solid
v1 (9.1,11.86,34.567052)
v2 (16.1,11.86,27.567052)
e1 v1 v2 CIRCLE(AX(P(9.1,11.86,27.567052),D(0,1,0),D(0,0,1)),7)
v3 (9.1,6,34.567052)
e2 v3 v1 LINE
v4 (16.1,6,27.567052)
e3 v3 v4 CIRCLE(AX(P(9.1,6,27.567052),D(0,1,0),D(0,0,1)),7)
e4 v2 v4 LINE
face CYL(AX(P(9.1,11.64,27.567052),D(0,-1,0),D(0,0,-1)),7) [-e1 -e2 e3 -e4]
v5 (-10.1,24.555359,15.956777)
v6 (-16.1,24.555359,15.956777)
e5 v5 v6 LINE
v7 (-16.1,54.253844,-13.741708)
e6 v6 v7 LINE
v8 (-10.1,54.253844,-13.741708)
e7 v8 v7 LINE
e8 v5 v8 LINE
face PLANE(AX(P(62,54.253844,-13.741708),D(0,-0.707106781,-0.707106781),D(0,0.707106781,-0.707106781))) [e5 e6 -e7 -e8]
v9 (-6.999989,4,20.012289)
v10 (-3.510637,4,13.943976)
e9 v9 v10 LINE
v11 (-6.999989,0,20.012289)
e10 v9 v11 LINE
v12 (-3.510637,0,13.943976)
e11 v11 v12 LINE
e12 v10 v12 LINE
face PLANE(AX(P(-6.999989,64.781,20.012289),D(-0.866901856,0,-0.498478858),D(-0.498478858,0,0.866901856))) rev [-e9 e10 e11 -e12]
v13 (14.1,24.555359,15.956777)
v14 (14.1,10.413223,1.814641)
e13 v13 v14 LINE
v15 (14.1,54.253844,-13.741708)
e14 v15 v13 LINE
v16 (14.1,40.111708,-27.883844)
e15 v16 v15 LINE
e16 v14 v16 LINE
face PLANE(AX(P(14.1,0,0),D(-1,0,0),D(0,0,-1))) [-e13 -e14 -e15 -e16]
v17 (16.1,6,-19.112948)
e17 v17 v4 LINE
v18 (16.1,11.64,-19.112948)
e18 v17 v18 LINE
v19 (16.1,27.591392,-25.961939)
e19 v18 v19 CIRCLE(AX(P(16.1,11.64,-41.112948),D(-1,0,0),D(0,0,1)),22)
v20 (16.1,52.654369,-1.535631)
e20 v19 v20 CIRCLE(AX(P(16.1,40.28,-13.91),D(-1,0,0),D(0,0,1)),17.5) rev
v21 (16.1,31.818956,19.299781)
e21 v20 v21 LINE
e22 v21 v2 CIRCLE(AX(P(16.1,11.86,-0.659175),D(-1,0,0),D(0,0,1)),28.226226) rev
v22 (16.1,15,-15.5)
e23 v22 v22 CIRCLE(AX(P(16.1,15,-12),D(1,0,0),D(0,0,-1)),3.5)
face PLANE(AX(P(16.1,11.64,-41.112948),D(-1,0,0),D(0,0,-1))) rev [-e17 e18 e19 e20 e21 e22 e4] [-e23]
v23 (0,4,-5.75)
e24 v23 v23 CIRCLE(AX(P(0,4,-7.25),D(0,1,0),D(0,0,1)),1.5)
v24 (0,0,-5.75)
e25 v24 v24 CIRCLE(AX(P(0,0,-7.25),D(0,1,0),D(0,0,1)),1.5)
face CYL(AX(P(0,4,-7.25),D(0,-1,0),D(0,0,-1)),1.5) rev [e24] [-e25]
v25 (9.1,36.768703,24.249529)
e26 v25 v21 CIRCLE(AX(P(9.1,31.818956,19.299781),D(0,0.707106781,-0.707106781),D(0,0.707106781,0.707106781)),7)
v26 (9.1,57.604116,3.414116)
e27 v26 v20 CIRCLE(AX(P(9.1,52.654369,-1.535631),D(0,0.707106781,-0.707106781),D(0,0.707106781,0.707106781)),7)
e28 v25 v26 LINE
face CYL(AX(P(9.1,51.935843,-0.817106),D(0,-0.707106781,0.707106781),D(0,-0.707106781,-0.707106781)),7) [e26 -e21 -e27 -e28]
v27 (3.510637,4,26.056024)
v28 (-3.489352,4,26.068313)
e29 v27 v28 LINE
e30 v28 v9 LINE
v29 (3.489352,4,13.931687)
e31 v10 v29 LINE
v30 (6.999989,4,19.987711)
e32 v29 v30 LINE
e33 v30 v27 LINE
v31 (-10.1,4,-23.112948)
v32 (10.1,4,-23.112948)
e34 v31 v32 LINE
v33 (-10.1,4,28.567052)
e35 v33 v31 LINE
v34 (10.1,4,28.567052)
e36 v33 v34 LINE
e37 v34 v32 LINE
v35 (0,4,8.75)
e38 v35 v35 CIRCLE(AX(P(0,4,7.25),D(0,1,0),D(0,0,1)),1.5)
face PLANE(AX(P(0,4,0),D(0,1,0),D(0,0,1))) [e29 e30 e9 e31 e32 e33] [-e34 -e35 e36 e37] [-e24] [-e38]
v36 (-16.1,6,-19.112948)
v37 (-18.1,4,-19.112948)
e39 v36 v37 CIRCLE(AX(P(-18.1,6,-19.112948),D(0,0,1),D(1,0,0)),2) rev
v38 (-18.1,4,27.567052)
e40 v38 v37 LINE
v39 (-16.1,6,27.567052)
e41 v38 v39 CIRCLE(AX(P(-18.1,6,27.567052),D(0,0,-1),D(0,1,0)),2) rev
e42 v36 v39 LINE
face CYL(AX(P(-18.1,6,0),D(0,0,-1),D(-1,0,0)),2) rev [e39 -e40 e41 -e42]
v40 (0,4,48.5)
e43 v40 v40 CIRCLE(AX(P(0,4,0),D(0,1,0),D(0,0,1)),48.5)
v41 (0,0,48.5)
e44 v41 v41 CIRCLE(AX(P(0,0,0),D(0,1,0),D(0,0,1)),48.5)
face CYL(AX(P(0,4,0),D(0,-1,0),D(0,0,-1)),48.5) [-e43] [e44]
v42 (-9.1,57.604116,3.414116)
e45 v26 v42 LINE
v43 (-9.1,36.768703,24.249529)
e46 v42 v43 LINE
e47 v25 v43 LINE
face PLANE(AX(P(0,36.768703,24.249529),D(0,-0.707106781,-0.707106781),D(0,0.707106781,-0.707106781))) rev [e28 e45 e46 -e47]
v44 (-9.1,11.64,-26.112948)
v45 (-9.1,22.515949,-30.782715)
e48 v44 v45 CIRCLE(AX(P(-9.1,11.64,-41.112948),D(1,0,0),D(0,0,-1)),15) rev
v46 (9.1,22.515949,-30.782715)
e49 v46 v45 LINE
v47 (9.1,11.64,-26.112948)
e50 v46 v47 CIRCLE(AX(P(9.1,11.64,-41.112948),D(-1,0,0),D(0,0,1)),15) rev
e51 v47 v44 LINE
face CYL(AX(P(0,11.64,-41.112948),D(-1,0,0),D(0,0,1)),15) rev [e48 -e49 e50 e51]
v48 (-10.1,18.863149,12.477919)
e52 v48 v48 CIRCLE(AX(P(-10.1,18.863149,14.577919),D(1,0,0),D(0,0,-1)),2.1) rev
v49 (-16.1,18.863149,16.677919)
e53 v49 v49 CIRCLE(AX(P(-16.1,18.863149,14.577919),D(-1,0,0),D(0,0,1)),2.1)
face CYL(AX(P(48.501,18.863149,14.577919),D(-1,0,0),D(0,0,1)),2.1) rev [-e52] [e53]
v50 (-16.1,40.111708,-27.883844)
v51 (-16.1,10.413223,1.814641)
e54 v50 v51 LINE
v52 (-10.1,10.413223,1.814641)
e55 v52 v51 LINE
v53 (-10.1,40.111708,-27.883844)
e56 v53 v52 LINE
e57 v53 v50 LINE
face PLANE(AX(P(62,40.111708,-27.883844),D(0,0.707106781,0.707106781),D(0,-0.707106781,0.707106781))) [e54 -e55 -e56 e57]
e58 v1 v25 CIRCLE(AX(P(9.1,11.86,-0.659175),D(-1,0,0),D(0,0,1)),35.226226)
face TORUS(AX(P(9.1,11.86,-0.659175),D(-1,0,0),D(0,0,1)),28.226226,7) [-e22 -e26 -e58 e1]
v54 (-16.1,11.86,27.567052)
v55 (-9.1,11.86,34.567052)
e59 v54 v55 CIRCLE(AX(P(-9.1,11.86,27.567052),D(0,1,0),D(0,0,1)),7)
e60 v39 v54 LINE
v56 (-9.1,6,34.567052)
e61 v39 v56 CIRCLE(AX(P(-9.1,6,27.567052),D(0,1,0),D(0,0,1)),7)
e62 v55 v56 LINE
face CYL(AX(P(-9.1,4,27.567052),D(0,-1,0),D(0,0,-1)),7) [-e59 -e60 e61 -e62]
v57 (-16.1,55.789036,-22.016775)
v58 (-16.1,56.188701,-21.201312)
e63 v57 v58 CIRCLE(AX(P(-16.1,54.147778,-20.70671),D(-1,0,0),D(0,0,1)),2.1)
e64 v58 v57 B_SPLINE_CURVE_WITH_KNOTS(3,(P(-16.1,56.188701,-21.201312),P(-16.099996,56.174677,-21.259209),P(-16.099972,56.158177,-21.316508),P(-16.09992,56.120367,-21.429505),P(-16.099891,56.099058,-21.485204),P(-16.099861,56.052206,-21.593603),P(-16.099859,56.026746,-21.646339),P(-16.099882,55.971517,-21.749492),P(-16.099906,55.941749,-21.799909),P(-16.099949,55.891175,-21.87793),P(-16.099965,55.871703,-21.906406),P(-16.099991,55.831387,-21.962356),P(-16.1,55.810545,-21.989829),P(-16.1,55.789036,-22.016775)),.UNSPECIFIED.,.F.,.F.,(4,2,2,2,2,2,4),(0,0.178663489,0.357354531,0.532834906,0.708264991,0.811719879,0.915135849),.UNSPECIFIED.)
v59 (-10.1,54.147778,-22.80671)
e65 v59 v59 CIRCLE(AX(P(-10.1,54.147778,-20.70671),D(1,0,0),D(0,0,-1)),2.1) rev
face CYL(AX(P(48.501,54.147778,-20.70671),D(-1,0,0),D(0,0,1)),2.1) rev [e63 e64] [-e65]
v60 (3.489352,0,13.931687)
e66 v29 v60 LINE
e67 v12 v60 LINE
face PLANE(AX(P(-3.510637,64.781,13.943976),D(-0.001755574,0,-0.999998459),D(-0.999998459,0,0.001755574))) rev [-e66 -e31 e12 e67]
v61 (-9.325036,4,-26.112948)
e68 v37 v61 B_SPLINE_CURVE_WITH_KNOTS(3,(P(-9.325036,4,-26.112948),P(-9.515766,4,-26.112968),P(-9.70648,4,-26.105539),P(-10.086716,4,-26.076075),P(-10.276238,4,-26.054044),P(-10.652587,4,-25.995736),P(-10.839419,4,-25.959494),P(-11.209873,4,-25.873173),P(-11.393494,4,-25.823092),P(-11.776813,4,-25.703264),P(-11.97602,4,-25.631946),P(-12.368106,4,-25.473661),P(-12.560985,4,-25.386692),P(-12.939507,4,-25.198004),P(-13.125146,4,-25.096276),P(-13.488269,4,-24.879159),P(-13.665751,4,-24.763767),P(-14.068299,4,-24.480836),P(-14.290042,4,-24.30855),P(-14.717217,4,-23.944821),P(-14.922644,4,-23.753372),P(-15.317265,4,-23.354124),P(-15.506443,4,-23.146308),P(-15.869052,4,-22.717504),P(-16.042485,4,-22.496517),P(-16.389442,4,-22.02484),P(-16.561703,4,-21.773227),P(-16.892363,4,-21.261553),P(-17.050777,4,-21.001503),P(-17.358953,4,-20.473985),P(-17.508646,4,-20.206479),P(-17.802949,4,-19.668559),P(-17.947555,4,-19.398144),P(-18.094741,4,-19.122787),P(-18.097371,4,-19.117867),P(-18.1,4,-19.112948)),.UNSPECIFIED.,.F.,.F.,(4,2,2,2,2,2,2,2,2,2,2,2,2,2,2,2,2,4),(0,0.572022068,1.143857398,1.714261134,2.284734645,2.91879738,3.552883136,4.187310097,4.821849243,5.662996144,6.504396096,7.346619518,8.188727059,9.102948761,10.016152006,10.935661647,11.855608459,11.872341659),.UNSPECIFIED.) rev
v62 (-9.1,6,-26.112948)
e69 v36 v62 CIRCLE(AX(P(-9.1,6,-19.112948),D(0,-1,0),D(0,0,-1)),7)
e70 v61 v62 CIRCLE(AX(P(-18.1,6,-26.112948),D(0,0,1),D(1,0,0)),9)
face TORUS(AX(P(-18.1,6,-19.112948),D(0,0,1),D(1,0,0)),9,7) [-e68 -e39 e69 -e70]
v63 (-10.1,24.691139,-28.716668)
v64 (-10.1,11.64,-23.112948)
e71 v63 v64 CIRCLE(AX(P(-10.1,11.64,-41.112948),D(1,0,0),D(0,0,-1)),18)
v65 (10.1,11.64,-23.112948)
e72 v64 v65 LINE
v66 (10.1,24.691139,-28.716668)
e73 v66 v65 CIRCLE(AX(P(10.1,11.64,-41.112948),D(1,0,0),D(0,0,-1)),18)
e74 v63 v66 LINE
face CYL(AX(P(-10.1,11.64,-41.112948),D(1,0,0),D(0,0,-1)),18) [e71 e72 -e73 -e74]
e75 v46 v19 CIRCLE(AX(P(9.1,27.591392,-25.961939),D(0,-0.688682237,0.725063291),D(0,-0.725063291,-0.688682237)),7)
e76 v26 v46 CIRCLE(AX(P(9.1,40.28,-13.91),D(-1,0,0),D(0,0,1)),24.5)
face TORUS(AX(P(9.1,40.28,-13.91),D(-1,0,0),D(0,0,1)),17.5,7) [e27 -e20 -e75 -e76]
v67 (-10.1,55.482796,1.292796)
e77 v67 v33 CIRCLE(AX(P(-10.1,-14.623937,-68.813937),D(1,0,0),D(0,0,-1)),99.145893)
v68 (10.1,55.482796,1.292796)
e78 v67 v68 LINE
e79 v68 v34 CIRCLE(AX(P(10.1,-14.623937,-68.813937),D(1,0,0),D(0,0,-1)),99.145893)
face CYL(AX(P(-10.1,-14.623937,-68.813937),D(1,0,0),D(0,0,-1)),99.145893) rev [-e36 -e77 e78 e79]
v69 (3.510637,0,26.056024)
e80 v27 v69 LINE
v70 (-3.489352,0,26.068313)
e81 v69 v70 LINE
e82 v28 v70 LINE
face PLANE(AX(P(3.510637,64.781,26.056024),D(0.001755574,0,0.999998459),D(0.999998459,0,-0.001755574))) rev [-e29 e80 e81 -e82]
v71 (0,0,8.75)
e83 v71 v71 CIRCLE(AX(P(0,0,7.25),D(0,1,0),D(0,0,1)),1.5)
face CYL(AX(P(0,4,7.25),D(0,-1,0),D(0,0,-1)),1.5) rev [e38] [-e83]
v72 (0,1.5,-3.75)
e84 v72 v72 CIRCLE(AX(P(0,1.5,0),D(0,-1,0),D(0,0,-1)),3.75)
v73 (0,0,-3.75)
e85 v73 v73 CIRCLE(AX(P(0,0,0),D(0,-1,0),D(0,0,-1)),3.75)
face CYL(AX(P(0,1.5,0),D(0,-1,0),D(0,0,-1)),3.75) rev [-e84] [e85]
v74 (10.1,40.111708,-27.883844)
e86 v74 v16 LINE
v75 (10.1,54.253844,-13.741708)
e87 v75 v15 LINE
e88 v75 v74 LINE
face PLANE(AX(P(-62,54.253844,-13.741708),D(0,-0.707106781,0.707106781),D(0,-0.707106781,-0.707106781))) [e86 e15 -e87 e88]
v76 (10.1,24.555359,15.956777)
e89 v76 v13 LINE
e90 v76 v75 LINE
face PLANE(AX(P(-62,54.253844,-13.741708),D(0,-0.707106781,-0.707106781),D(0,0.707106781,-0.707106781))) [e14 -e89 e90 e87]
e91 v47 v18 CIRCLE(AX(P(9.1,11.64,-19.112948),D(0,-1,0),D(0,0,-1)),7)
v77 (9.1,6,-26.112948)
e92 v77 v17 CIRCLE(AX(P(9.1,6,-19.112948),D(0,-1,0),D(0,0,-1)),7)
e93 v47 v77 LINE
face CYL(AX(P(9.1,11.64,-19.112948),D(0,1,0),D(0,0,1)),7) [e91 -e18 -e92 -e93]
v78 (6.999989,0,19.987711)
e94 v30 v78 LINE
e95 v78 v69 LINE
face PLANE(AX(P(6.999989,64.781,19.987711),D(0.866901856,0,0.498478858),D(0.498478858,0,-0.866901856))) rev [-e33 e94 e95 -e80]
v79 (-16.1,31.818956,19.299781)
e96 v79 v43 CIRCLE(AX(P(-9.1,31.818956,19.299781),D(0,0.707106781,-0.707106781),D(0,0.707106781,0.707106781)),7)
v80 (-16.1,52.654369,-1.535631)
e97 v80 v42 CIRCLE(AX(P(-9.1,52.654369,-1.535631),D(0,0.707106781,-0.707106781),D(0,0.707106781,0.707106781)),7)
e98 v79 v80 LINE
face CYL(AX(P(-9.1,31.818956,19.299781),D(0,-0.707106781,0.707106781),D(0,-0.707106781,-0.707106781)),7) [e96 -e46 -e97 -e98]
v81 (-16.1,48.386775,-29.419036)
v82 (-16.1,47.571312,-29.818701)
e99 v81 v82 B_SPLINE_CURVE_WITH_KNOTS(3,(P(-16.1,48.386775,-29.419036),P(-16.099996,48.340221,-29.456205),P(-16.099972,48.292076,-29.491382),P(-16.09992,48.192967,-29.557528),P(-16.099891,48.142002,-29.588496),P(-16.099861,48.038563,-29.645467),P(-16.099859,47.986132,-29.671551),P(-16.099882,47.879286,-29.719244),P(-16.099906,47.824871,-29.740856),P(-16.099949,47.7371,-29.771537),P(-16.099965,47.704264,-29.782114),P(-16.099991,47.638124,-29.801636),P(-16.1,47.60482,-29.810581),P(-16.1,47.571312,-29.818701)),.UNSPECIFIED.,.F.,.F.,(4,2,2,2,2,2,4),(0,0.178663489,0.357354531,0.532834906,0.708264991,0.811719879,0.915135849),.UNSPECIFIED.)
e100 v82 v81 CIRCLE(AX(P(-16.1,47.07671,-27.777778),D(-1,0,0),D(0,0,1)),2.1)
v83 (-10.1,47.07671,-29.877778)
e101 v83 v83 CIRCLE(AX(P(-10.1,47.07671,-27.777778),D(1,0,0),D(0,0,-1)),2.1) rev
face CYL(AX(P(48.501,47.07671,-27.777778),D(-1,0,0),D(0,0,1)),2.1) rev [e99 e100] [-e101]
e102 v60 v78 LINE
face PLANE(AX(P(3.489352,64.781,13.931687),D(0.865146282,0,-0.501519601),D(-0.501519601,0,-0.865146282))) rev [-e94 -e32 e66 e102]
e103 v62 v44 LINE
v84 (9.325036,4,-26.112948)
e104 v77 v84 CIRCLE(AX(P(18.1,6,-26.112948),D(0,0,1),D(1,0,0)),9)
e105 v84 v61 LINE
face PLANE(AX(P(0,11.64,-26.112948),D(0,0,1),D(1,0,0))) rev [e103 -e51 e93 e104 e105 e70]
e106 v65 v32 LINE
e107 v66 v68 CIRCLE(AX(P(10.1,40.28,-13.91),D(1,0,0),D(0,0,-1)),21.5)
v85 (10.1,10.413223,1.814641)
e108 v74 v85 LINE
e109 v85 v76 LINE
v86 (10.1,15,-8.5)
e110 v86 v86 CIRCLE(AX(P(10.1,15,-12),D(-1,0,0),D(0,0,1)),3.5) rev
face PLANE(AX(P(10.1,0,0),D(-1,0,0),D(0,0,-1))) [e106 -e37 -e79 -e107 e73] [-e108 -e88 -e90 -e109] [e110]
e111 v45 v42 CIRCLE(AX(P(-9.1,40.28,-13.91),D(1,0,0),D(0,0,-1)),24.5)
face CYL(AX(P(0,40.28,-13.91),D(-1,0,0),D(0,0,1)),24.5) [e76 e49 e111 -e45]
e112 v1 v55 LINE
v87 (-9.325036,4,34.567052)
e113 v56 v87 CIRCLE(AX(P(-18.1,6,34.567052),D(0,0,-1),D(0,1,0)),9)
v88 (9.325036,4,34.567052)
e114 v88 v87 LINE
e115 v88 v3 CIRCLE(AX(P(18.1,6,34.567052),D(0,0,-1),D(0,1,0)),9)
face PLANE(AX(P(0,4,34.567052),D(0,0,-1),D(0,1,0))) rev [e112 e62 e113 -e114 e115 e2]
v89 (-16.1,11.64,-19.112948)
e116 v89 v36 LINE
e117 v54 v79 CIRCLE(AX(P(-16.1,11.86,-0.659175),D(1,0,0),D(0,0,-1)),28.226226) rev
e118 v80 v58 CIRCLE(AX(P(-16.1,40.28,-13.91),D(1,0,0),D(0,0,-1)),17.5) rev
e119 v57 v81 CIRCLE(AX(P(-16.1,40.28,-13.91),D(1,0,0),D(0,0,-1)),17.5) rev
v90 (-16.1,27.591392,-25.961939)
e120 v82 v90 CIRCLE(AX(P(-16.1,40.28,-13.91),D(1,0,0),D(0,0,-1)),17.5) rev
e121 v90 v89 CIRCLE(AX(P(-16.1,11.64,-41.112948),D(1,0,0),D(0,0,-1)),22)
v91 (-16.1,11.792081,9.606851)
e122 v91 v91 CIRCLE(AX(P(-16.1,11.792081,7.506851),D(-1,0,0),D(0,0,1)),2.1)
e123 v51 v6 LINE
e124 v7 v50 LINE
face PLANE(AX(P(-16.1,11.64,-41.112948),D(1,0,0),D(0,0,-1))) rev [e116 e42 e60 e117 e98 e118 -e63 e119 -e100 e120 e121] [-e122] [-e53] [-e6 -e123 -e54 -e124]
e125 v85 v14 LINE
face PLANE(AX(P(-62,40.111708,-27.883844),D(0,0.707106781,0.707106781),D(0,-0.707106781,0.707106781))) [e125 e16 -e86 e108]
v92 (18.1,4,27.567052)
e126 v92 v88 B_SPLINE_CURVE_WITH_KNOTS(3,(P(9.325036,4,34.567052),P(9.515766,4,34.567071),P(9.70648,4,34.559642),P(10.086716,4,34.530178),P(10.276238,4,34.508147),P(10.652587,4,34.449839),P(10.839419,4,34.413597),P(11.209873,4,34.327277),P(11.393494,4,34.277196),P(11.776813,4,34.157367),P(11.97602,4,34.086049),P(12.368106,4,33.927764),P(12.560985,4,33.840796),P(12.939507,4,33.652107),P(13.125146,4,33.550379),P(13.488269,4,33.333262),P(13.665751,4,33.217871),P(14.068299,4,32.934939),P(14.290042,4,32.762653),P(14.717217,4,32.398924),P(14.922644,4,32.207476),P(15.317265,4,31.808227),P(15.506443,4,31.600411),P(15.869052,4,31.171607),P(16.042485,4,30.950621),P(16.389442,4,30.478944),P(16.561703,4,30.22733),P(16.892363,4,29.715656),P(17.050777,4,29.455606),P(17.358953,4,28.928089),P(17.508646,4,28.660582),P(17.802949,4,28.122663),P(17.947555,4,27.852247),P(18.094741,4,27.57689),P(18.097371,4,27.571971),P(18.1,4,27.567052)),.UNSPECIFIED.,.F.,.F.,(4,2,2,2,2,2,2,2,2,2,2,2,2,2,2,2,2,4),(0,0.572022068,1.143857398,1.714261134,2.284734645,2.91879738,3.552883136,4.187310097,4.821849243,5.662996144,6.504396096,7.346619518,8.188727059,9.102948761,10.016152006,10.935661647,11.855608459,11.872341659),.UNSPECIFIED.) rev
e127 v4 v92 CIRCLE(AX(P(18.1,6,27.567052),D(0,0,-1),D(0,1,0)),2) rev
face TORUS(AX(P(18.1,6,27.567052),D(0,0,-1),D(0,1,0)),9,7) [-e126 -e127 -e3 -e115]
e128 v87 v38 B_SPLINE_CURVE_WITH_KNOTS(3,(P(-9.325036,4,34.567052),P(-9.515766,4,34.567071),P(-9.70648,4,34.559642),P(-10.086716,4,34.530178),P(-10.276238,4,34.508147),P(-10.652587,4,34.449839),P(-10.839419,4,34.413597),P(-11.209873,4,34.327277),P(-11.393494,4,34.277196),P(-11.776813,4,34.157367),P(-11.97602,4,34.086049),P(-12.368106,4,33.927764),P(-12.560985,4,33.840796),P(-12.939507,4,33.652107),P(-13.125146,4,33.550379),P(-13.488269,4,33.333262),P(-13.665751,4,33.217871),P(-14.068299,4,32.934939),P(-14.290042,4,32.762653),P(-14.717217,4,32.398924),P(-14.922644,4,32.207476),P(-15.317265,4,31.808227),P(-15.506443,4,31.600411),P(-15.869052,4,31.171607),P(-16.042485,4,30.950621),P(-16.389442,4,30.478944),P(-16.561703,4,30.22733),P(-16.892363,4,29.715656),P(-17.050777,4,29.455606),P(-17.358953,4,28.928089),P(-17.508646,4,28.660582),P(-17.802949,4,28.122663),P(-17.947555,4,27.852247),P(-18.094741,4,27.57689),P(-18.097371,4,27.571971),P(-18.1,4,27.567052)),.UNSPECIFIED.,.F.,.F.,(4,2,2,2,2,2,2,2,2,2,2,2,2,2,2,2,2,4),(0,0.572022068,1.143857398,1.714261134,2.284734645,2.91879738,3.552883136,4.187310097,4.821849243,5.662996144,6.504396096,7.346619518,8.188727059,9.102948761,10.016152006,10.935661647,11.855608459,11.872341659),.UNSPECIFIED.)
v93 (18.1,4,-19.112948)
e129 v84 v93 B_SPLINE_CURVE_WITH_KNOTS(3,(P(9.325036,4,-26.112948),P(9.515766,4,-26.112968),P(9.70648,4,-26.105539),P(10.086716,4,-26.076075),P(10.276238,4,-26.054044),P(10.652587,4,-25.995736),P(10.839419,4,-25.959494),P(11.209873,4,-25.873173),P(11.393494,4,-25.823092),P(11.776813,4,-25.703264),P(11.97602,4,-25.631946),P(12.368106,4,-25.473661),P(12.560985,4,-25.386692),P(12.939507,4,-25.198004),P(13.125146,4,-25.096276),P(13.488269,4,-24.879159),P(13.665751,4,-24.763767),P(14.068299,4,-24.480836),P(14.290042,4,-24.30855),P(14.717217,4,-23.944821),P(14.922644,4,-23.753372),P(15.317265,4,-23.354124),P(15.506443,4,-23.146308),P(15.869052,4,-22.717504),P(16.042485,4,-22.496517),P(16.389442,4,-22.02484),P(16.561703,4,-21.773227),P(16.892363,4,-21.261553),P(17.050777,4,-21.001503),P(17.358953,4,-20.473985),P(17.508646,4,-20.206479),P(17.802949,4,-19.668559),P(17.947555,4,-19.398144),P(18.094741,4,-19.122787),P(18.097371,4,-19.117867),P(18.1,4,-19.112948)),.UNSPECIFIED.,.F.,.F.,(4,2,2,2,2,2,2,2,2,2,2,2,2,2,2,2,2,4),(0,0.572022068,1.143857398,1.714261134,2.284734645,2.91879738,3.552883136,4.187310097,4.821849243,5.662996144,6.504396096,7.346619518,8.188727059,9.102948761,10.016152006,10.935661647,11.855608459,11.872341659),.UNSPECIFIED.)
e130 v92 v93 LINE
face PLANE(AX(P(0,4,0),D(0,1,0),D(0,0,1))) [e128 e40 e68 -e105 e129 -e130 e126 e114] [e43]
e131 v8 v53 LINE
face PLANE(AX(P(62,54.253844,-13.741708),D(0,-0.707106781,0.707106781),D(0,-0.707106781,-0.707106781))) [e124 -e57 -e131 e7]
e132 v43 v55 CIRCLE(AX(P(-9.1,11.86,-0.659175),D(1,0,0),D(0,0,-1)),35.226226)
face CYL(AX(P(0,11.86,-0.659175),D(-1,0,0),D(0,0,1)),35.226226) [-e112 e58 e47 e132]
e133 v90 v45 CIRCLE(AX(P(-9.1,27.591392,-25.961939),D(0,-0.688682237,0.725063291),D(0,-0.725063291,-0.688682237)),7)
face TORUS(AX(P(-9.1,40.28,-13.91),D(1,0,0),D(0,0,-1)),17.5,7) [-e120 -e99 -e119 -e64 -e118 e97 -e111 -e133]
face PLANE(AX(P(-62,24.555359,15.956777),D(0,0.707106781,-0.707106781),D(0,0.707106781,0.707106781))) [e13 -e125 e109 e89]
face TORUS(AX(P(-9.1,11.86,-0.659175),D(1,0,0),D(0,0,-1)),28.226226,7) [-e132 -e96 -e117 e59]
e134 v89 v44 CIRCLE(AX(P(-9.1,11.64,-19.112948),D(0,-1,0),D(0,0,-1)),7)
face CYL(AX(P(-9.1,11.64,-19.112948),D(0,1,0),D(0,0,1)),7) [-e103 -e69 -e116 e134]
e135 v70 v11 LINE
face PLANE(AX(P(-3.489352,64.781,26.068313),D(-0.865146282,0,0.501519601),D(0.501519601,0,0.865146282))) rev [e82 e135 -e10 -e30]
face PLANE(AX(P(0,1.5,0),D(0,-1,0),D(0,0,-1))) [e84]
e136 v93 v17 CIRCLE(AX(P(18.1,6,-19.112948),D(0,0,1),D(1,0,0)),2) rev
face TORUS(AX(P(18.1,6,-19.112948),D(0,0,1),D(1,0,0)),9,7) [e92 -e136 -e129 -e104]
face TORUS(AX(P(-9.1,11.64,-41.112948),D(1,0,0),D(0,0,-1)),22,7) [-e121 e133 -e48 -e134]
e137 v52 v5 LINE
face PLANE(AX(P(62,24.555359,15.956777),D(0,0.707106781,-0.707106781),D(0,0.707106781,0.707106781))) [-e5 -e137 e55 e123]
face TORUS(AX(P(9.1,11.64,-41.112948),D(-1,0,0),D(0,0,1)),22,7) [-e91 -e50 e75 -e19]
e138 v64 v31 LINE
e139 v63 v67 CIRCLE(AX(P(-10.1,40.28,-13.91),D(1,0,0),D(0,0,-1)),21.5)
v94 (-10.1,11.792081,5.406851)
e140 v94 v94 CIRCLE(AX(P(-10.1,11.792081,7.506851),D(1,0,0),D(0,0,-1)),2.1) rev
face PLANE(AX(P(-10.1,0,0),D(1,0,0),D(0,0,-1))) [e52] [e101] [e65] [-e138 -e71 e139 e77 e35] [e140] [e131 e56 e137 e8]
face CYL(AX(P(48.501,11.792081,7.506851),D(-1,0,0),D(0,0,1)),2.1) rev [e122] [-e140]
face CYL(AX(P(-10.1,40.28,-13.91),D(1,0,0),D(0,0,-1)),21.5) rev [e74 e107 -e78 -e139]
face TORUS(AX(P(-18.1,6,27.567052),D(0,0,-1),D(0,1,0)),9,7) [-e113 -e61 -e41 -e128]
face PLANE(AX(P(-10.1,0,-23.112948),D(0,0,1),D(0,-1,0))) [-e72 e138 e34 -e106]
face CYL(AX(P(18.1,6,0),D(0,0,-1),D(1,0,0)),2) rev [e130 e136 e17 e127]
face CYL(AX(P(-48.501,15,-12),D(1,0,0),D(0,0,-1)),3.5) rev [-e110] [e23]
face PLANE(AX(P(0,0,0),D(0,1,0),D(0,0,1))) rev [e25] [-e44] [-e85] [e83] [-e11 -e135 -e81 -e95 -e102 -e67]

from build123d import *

# Parameters (mm, degrees)
SKETCH1_R           = 48.5
SKETCH1_R_2         = 1.5
BOSS_EXTRUDE1_DEPTH = 4
SKETCH2_R           = 3.75
CUT_EXTRUDE1_DEPTH  = 1.5
BOSS_EXTRUDE2_DEPTH = 16.1
CUT_EXTRUDE3_DEPTH  = 14.1
FILLET3_R           = 2
CUT_EXTRUDE4_DEPTH  = 10.1
CUT_EXTRUDE5_DEPTH  = 5
CUT_EXTRUDE6_REACH  = 105.546
SKETCH7_R           = 2.1
FILLET4_R           = 7
CUT_EXTRUDE7_REACH  = 96.345
CUT_EXTRUDE9_REACH  = 105.546
SKETCH10_R          = 3.5


with BuildPart() as part:
    # Sketch1 → Boss-Extrude1 (new body)
    with BuildSketch(Plane(origin=(0, 0, 0), x_dir=(1, 0, 0), z_dir=(0, 1, 0))):
        with Locations(Location((0, 0, 0), (0, 0, 270))):
            Circle(SKETCH1_R)
        with Locations(Location((0, 7.25, 0), (0, 0, 270))):
            Circle(SKETCH1_R_2, mode=Mode.SUBTRACT)
        with Locations(Location((0, -7.25, 0), (0, 0, 270))):
            Circle(SKETCH1_R_2, mode=Mode.SUBTRACT)
    extrude(amount=BOSS_EXTRUDE1_DEPTH)

    # Sketch2 → Cut-Extrude1 (cut)
    with BuildSketch(Plane.XZ):
        with Locations(Location((0, 0, 0), (0, 0, 270))):
            Circle(SKETCH2_R)
    extrude(amount=-CUT_EXTRUDE1_DEPTH, mode=Mode.SUBTRACT)

    # Sketch3 → Boss-Extrude2 (add)
    with BuildSketch(Plane(origin=(-16.1, 0, 0), x_dir=(0, 0, -1), z_dir=(1, 0, 0))):
        with BuildLine():
            Line((-34.56705163, 4), (-34.56705163, 11.86))
            ThreePointArc((-34.56705163, 11.86), (-31.885614823, 25.340493156), (-24.249528849, 36.768703429))
            Line((-24.249528849, 36.768703429), (-3.414116139, 57.604116139))
            ThreePointArc((-3.414116139, 57.604116139), (31.45553512, 57.379830331), (30.782714812, 22.515949367))
            ThreePointArc((30.782714812, 22.515949367), (27.329742948, 17.558044298), (26.11294837, 11.64))
            Line((26.11294837, 11.64), (26.11294837, 4))
            Line((26.11294837, 4), (-34.56705163, 4))
        make_face()
    extrude(amount=BOSS_EXTRUDE2_DEPTH)

    # Sketch4 → Cut-Extrude3 (cut)
    with BuildSketch(Plane(origin=(-14.1, 0, 0), x_dir=(0, 0, -1), z_dir=(1, 0, 0))):
        Polygon((13.741708053, 54.253843677), (27.883843677, 40.111708053), (-1.814641133, 10.413223243), (-15.956776757, 24.555358867), align=None)
    extrude(amount=CUT_EXTRUDE3_DEPTH, mode=Mode.SUBTRACT)

    # Fillet3
    fillet3_edges = [part.edges().sort_by_distance(p)[0] for p in [
        (-16.1, 4, 4.22705163),
    ]]
    fillet(fillet3_edges, radius=FILLET3_R)

    # Sketch5 → Cut-Extrude4 (cut)
    with BuildSketch(Plane(origin=(0, 0, 0), x_dir=(0, 0, -1), z_dir=(1, 0, 0))):
        with BuildLine():
            ThreePointArc((-1.292795796, 55.482795796), (-18.79687153, 31.790007), (-28.56705163, 4))
            Line((-28.56705163, 4), (-8.75, 4))
            Line((-8.75, 4), (-5.75, 4))
            Line((-5.75, 4), (5.75, 4))
            Line((5.75, 4), (8.75, 4))
            Line((8.75, 4), (23.11294837, 4))
            Line((23.11294837, 4), (23.11294837, 11.64))
            ThreePointArc((23.11294837, 11.64), (24.573101864, 18.741653158), (28.7166681, 24.691139241))
            ThreePointArc((28.7166681, 24.691139241), (29.307102248, 55.285973556), (-1.292795796, 55.482795796))
        make_face()
        Polygon((27.883843677, 40.111708053), (-1.814641133, 10.413223243), (-15.956776757, 24.555358867), (13.741708053, 54.253843677), align=None, mode=Mode.SUBTRACT)
    extrude(amount=-CUT_EXTRUDE4_DEPTH, mode=Mode.SUBTRACT)

    # Mirror6: part across plane


with BuildPart() as part_1:
    add(part.part)
    add(part.part.mirror(Plane(origin=(0, 11.64, -41.11294837), x_dir=(0, 0, 1), z_dir=(1, 0, 0))))

    # Sketch6 → Cut-Extrude5 (cut)
    with BuildSketch(Plane.ZY.offset(16.1)):
        Polygon((-27.883843677, 40.111708053), (1.814641133, 10.413223243), (15.956776757, 24.555358867), (-13.741708053, 54.253843677), align=None)
    extrude(amount=-CUT_EXTRUDE5_DEPTH, mode=Mode.SUBTRACT)

    # Sketch7 → Cut-Extrude6 (cut, up to next)
    with BuildSketch(Plane.ZY.offset(16.1), mode=Mode.PRIVATE) as cut_extrude6_sk1:
        with Locations((-20.706709848, 54.14777766)):
            Circle(SKETCH7_R)
    cut_extrude6_tool1 = extrude(cut_extrude6_sk1.sketch, amount=-CUT_EXTRUDE6_REACH, mode=Mode.PRIVATE) & part_1.part
    # Sketch7 → Cut-Extrude6 (cut, up to next)
    with BuildSketch(Plane.ZY.offset(16.1), mode=Mode.PRIVATE) as cut_extrude6_sk2:
        with Locations((-27.77777766, 47.076709848)):
            Circle(SKETCH7_R)
    cut_extrude6_tool2 = extrude(cut_extrude6_sk2.sketch, amount=-CUT_EXTRUDE6_REACH, mode=Mode.PRIVATE) & part_1.part
    # Sketch7 → Cut-Extrude6 (cut, up to next)
    with BuildSketch(Plane.ZY.offset(16.1), mode=Mode.PRIVATE) as cut_extrude6_sk3:
        with Locations((14.577918533, 18.863149278)):
            Circle(SKETCH7_R)
    cut_extrude6_tool3 = extrude(cut_extrude6_sk3.sketch, amount=-CUT_EXTRUDE6_REACH, mode=Mode.PRIVATE) & part_1.part
    # Sketch7 → Cut-Extrude6 (cut, up to next)
    with BuildSketch(Plane.ZY.offset(16.1), mode=Mode.PRIVATE) as cut_extrude6_sk4:
        with Locations((7.506850722, 11.792081467)):
            Circle(SKETCH7_R)
    cut_extrude6_tool4 = extrude(cut_extrude6_sk4.sketch, amount=-CUT_EXTRUDE6_REACH, mode=Mode.PRIVATE) & part_1.part
    add(cut_extrude6_tool1.solids().sort_by_distance((-16.1, 54.147778, -20.70671))[0], mode=Mode.SUBTRACT)
    add(cut_extrude6_tool2.solids().sort_by_distance((-16.1, 47.07671, -27.777778))[0], mode=Mode.SUBTRACT)
    add(cut_extrude6_tool3.solids().sort_by_distance((-16.1, 18.863149, 14.577919))[0], mode=Mode.SUBTRACT)
    add(cut_extrude6_tool4.solids().sort_by_distance((-16.1, 11.792081, 7.506851))[0], mode=Mode.SUBTRACT)

    # Fillet4
    # the kernel refuses this fillet: 7 mm, written as the material it takes off along each edge
    with BuildSketch(Plane(origin=(16.1, 11.64, -26.11294837), x_dir=(-1, 0, 0), z_dir=(0, -1, 0))) as fillet4_piece_1:
        with BuildLine():
            CenterArc((FILLET4_R, -FILLET4_R), FILLET4_R, 90, 90)
            Line((0, -FILLET4_R), (0, 0))
            Line((0, 0), (FILLET4_R, 0))
        make_face()
    extrude(amount=5.64, mode=Mode.SUBTRACT)
    with BuildSketch(Plane(origin=(16.1, 11.64, -41.11294837), x_dir=(0, 0.7250632911392403, 0.6886822372054715), z_dir=(0, 0.6886822372054715, -0.7250632911392403))) as fillet4_piece_2:
        with BuildLine():
            CenterArc((15 + FILLET4_R, -FILLET4_R), FILLET4_R, 90, 90)
            Line((15, -FILLET4_R), (15, 0))
            Line((15, 0), (15 + FILLET4_R, 0))
        make_face()
    revolve(axis=Axis((16.1, 11.64, -41.11294837), (1, 0, 0)), revolution_arc=46.474113163, mode=Mode.SUBTRACT)
    with BuildSketch(Plane(origin=(16.1, 40.28, -13.91), x_dir=(0, 0.7071067811865517, 0.7071067811865432), z_dir=(0, -0.7071067811865432, 0.7071067811865517))) as fillet4_piece_3:
        with BuildLine():
            CenterArc((24.5 - FILLET4_R, FILLET4_R), FILLET4_R, 270, 90)
            Line((24.5, FILLET4_R), (24.5, 0))
            Line((24.5, 0), (24.5 - FILLET4_R, 0))
        make_face()
    revolve(axis=Axis((16.1, 40.28, -13.91), (-1, 0, 0)), revolution_arc=181.474113163, mode=Mode.SUBTRACT)
    with BuildSketch(Plane(origin=(16.1, 36.768703429, 24.249528849), x_dir=(0, -0.707106781186551, -0.7071067811865439), z_dir=(0, 0.707106781186544, -0.707106781186551))) as fillet4_piece_4:
        with BuildLine():
            CenterArc((FILLET4_R, FILLET4_R), FILLET4_R, 180, 90)
            Line((0, FILLET4_R), (0, 0))
            Line((0, 0), (FILLET4_R, 0))
        make_face()
    extrude(amount=29.465723232, mode=Mode.SUBTRACT)
    with BuildSketch(Plane(origin=(16.1, 11.86, -0.65917458), x_dir=(0, 0, 1), z_dir=(0, -1, 0))) as fillet4_piece_5:
        with BuildLine():
            CenterArc((35.226226211 - FILLET4_R, FILLET4_R), FILLET4_R, 270, 90)
            Line((35.226226211, FILLET4_R), (35.226226211, 0))
            Line((35.226226211, 0), (35.226226211 - FILLET4_R, 0))
        make_face()
    revolve(axis=Axis((16.1, 11.86, -0.65917458), (-1, 0, 0)), revolution_arc=45, mode=Mode.SUBTRACT)
    with BuildSketch(Plane(origin=(16.1, 6, 34.56705163), x_dir=(-1, 0, 0), z_dir=(0, 1, 0))) as fillet4_piece_6:
        with BuildLine():
            CenterArc((FILLET4_R, -FILLET4_R), FILLET4_R, 90, 90)
            Line((0, -FILLET4_R), (0, 0))
            Line((0, 0), (FILLET4_R, 0))
        make_face()
    extrude(amount=5.86, mode=Mode.SUBTRACT)
    with BuildSketch(Plane(origin=(18.1, 6, 34.56705163), x_dir=(-0.9999802608561372, 0.006283143965558844, 0), z_dir=(-0.006283143965558844, -0.9999802608561372, 0))) as fillet4_piece_7_section:
        with BuildLine():
            CenterArc((2 + FILLET4_R, FILLET4_R), FILLET4_R, 180, 90)
            Line((2 + FILLET4_R, 0), (2, 0))
            Line((2, 0), (2, FILLET4_R))
        make_face()
    fillet4_piece_7 = revolve(axis=Axis((18.1, 6, 34.56705163), (0, 0, -1)), revolution_arc=359.64, mode=Mode.PRIVATE)
    fillet4_piece_7 = split(fillet4_piece_7, bisect_by=Plane(origin=(18.1, 4, 34.56705163), z_dir=(0, 1, 0)), keep=Keep.TOP, mode=Mode.PRIVATE)
    add(fillet4_piece_7, mode=Mode.SUBTRACT)
    with BuildSketch(Plane(origin=(18.1, 6, -26.11294837), x_dir=(-0.9999802608561372, 0.006283143965558844, 0), z_dir=(-0.006283143965558844, -0.9999802608561372, 0))) as fillet4_piece_8_section:
        with BuildLine():
            CenterArc((2 + FILLET4_R, -FILLET4_R), FILLET4_R, 90, 90)
            Line((2, -FILLET4_R), (2, 0))
            Line((2, 0), (2 + FILLET4_R, 0))
        make_face()
    fillet4_piece_8 = revolve(axis=Axis((18.1, 6, -26.11294837), (0, 0, -1)), revolution_arc=359.64, mode=Mode.PRIVATE)
    fillet4_piece_8 = split(fillet4_piece_8, bisect_by=Plane(origin=(18.1, 4, -26.11294837), z_dir=(0, 1, 0)), keep=Keep.TOP, mode=Mode.PRIVATE)
    add(fillet4_piece_8, mode=Mode.SUBTRACT)
    with BuildSketch(Plane(origin=(-16.1, 11.64, -41.11294837), x_dir=(0, 0.7250632911392403, 0.6886822372054715), z_dir=(0, 0.6886822372054715, -0.7250632911392403))) as fillet4_piece_9:
        with BuildLine():
            CenterArc((15 + FILLET4_R, FILLET4_R), FILLET4_R, 180, 90)
            Line((15, FILLET4_R), (15, 0))
            Line((15, 0), (15 + FILLET4_R, 0))
        make_face()
    revolve(axis=Axis((-16.1, 11.64, -41.11294837), (1, 0, 0)), revolution_arc=46.474113163, mode=Mode.SUBTRACT)
    with BuildSketch(Plane(origin=(-16.1, 40.28, -13.91), x_dir=(0, 0.7071067811865517, 0.7071067811865432), z_dir=(0, -0.7071067811865432, 0.7071067811865517))) as fillet4_piece_10:
        with BuildLine():
            CenterArc((24.5 - FILLET4_R, -FILLET4_R), FILLET4_R, 0, 90)
            Line((24.5, -FILLET4_R), (24.5, 0))
            Line((24.5, 0), (24.5 - FILLET4_R, 0))
        make_face()
    revolve(axis=Axis((-16.1, 40.28, -13.91), (-1, 0, 0)), revolution_arc=181.474113163, mode=Mode.SUBTRACT)
    with BuildSketch(Plane(origin=(-16.1, 36.768703429, 24.249528849), x_dir=(0, -0.707106781186551, -0.7071067811865439), z_dir=(0, 0.707106781186544, -0.707106781186551))) as fillet4_piece_11:
        with BuildLine():
            CenterArc((FILLET4_R, -FILLET4_R), FILLET4_R, 90, 90)
            Line((0, -FILLET4_R), (0, 0))
            Line((0, 0), (FILLET4_R, 0))
        make_face()
    extrude(amount=29.465723232, mode=Mode.SUBTRACT)
    with BuildSketch(Plane(origin=(-16.1, 11.86, -0.65917458), x_dir=(0, 0, 1), z_dir=(0, -1, 0))) as fillet4_piece_12:
        with BuildLine():
            CenterArc((35.226226211 - FILLET4_R, -FILLET4_R), FILLET4_R, 0, 90)
            Line((35.226226211, -FILLET4_R), (35.226226211, 0))
            Line((35.226226211, 0), (35.226226211 - FILLET4_R, 0))
        make_face()
    revolve(axis=Axis((-16.1, 11.86, -0.65917458), (-1, 0, 0)), revolution_arc=45, mode=Mode.SUBTRACT)
    with BuildSketch(Plane(origin=(-16.1, 6, 34.56705163), x_dir=(1, 0, 0), z_dir=(0, 1, 0))) as fillet4_piece_13:
        with BuildLine():
            CenterArc((FILLET4_R, FILLET4_R), FILLET4_R, 180, 90)
            Line((0, FILLET4_R), (0, 0))
            Line((0, 0), (FILLET4_R, 0))
        make_face()
    extrude(amount=5.86, mode=Mode.SUBTRACT)
    with BuildSketch(Plane(origin=(-16.1, 11.64, -26.11294837), x_dir=(1, 0, 0), z_dir=(0, -1, 0))) as fillet4_piece_14:
        with BuildLine():
            CenterArc((FILLET4_R, FILLET4_R), FILLET4_R, 180, 90)
            Line((0, FILLET4_R), (0, 0))
            Line((0, 0), (FILLET4_R, 0))
        make_face()
    extrude(amount=5.64, mode=Mode.SUBTRACT)
    with BuildSketch(Plane(origin=(-18.1, 6, -26.11294837), x_dir=(0.9999802608561372, 0.006283143965558844, 0), z_dir=(0.006283143965558844, -0.9999802608561372, 0))) as fillet4_piece_15_section:
        with BuildLine():
            CenterArc((2 + FILLET4_R, FILLET4_R), FILLET4_R, 180, 90)
            Line((2 + FILLET4_R, 0), (2, 0))
            Line((2, 0), (2, FILLET4_R))
        make_face()
    fillet4_piece_15 = revolve(axis=Axis((-18.1, 6, -26.11294837), (0, 0, 1)), revolution_arc=359.64, mode=Mode.PRIVATE)
    fillet4_piece_15 = split(fillet4_piece_15, bisect_by=Plane(origin=(-18.1, 4, -26.11294837), z_dir=(0, 1, 0)), keep=Keep.TOP, mode=Mode.PRIVATE)
    add(fillet4_piece_15, mode=Mode.SUBTRACT)
    with BuildSketch(Plane(origin=(-18.1, 6, 34.56705163), x_dir=(0.9999802608561372, 0.006283143965558844, 0), z_dir=(0.006283143965558844, -0.9999802608561372, 0))) as fillet4_piece_16_section:
        with BuildLine():
            CenterArc((2 + FILLET4_R, -FILLET4_R), FILLET4_R, 90, 90)
            Line((2 + FILLET4_R, 0), (2, 0))
            Line((2, 0), (2, -FILLET4_R))
        make_face()
    fillet4_piece_16 = revolve(axis=Axis((-18.1, 6, 34.56705163), (0, 0, 1)), revolution_arc=359.64, mode=Mode.PRIVATE)
    fillet4_piece_16 = split(fillet4_piece_16, bisect_by=Plane(origin=(-18.1, 4, 34.56705163), z_dir=(0, 1, 0)), keep=Keep.TOP, mode=Mode.PRIVATE)
    add(fillet4_piece_16, mode=Mode.SUBTRACT)

    # Sketch8 → Cut-Extrude7 (cut, up to next)
    with BuildSketch(Plane.XZ, mode=Mode.PRIVATE) as cut_extrude7_sk1:
        Polygon((3.510637207, 26.056023976), (-3.489352006, 26.068312993), (-6.999989213, 20.012289016), (-3.510637207, 13.943976024), (3.489352006, 13.931687007), (6.999989213, 19.987710984), align=None)
    cut_extrude7_tool1 = extrude(cut_extrude7_sk1.sketch, amount=-CUT_EXTRUDE7_REACH, mode=Mode.PRIVATE) & part_1.part
    add(cut_extrude7_tool1.solids().sort_by_distance((0, 0, 20))[0], mode=Mode.SUBTRACT)

    # Sketch10 → Cut-Extrude9 (cut, up to next)
    with BuildSketch(Plane(origin=(16.1, 0, 0), x_dir=(0, 0, -1), z_dir=(1, 0, 0)), mode=Mode.PRIVATE) as cut_extrude9_sk1:
        with Locations((12, 15)):
            Circle(SKETCH10_R)
    cut_extrude9_tool1 = extrude(cut_extrude9_sk1.sketch, amount=-CUT_EXTRUDE9_REACH, mode=Mode.PRIVATE) & part_1.part
    add(cut_extrude9_tool1.solids().sort_by_distance((16.1, 15, -12))[0], mode=Mode.SUBTRACT)


solid = part_1.part
